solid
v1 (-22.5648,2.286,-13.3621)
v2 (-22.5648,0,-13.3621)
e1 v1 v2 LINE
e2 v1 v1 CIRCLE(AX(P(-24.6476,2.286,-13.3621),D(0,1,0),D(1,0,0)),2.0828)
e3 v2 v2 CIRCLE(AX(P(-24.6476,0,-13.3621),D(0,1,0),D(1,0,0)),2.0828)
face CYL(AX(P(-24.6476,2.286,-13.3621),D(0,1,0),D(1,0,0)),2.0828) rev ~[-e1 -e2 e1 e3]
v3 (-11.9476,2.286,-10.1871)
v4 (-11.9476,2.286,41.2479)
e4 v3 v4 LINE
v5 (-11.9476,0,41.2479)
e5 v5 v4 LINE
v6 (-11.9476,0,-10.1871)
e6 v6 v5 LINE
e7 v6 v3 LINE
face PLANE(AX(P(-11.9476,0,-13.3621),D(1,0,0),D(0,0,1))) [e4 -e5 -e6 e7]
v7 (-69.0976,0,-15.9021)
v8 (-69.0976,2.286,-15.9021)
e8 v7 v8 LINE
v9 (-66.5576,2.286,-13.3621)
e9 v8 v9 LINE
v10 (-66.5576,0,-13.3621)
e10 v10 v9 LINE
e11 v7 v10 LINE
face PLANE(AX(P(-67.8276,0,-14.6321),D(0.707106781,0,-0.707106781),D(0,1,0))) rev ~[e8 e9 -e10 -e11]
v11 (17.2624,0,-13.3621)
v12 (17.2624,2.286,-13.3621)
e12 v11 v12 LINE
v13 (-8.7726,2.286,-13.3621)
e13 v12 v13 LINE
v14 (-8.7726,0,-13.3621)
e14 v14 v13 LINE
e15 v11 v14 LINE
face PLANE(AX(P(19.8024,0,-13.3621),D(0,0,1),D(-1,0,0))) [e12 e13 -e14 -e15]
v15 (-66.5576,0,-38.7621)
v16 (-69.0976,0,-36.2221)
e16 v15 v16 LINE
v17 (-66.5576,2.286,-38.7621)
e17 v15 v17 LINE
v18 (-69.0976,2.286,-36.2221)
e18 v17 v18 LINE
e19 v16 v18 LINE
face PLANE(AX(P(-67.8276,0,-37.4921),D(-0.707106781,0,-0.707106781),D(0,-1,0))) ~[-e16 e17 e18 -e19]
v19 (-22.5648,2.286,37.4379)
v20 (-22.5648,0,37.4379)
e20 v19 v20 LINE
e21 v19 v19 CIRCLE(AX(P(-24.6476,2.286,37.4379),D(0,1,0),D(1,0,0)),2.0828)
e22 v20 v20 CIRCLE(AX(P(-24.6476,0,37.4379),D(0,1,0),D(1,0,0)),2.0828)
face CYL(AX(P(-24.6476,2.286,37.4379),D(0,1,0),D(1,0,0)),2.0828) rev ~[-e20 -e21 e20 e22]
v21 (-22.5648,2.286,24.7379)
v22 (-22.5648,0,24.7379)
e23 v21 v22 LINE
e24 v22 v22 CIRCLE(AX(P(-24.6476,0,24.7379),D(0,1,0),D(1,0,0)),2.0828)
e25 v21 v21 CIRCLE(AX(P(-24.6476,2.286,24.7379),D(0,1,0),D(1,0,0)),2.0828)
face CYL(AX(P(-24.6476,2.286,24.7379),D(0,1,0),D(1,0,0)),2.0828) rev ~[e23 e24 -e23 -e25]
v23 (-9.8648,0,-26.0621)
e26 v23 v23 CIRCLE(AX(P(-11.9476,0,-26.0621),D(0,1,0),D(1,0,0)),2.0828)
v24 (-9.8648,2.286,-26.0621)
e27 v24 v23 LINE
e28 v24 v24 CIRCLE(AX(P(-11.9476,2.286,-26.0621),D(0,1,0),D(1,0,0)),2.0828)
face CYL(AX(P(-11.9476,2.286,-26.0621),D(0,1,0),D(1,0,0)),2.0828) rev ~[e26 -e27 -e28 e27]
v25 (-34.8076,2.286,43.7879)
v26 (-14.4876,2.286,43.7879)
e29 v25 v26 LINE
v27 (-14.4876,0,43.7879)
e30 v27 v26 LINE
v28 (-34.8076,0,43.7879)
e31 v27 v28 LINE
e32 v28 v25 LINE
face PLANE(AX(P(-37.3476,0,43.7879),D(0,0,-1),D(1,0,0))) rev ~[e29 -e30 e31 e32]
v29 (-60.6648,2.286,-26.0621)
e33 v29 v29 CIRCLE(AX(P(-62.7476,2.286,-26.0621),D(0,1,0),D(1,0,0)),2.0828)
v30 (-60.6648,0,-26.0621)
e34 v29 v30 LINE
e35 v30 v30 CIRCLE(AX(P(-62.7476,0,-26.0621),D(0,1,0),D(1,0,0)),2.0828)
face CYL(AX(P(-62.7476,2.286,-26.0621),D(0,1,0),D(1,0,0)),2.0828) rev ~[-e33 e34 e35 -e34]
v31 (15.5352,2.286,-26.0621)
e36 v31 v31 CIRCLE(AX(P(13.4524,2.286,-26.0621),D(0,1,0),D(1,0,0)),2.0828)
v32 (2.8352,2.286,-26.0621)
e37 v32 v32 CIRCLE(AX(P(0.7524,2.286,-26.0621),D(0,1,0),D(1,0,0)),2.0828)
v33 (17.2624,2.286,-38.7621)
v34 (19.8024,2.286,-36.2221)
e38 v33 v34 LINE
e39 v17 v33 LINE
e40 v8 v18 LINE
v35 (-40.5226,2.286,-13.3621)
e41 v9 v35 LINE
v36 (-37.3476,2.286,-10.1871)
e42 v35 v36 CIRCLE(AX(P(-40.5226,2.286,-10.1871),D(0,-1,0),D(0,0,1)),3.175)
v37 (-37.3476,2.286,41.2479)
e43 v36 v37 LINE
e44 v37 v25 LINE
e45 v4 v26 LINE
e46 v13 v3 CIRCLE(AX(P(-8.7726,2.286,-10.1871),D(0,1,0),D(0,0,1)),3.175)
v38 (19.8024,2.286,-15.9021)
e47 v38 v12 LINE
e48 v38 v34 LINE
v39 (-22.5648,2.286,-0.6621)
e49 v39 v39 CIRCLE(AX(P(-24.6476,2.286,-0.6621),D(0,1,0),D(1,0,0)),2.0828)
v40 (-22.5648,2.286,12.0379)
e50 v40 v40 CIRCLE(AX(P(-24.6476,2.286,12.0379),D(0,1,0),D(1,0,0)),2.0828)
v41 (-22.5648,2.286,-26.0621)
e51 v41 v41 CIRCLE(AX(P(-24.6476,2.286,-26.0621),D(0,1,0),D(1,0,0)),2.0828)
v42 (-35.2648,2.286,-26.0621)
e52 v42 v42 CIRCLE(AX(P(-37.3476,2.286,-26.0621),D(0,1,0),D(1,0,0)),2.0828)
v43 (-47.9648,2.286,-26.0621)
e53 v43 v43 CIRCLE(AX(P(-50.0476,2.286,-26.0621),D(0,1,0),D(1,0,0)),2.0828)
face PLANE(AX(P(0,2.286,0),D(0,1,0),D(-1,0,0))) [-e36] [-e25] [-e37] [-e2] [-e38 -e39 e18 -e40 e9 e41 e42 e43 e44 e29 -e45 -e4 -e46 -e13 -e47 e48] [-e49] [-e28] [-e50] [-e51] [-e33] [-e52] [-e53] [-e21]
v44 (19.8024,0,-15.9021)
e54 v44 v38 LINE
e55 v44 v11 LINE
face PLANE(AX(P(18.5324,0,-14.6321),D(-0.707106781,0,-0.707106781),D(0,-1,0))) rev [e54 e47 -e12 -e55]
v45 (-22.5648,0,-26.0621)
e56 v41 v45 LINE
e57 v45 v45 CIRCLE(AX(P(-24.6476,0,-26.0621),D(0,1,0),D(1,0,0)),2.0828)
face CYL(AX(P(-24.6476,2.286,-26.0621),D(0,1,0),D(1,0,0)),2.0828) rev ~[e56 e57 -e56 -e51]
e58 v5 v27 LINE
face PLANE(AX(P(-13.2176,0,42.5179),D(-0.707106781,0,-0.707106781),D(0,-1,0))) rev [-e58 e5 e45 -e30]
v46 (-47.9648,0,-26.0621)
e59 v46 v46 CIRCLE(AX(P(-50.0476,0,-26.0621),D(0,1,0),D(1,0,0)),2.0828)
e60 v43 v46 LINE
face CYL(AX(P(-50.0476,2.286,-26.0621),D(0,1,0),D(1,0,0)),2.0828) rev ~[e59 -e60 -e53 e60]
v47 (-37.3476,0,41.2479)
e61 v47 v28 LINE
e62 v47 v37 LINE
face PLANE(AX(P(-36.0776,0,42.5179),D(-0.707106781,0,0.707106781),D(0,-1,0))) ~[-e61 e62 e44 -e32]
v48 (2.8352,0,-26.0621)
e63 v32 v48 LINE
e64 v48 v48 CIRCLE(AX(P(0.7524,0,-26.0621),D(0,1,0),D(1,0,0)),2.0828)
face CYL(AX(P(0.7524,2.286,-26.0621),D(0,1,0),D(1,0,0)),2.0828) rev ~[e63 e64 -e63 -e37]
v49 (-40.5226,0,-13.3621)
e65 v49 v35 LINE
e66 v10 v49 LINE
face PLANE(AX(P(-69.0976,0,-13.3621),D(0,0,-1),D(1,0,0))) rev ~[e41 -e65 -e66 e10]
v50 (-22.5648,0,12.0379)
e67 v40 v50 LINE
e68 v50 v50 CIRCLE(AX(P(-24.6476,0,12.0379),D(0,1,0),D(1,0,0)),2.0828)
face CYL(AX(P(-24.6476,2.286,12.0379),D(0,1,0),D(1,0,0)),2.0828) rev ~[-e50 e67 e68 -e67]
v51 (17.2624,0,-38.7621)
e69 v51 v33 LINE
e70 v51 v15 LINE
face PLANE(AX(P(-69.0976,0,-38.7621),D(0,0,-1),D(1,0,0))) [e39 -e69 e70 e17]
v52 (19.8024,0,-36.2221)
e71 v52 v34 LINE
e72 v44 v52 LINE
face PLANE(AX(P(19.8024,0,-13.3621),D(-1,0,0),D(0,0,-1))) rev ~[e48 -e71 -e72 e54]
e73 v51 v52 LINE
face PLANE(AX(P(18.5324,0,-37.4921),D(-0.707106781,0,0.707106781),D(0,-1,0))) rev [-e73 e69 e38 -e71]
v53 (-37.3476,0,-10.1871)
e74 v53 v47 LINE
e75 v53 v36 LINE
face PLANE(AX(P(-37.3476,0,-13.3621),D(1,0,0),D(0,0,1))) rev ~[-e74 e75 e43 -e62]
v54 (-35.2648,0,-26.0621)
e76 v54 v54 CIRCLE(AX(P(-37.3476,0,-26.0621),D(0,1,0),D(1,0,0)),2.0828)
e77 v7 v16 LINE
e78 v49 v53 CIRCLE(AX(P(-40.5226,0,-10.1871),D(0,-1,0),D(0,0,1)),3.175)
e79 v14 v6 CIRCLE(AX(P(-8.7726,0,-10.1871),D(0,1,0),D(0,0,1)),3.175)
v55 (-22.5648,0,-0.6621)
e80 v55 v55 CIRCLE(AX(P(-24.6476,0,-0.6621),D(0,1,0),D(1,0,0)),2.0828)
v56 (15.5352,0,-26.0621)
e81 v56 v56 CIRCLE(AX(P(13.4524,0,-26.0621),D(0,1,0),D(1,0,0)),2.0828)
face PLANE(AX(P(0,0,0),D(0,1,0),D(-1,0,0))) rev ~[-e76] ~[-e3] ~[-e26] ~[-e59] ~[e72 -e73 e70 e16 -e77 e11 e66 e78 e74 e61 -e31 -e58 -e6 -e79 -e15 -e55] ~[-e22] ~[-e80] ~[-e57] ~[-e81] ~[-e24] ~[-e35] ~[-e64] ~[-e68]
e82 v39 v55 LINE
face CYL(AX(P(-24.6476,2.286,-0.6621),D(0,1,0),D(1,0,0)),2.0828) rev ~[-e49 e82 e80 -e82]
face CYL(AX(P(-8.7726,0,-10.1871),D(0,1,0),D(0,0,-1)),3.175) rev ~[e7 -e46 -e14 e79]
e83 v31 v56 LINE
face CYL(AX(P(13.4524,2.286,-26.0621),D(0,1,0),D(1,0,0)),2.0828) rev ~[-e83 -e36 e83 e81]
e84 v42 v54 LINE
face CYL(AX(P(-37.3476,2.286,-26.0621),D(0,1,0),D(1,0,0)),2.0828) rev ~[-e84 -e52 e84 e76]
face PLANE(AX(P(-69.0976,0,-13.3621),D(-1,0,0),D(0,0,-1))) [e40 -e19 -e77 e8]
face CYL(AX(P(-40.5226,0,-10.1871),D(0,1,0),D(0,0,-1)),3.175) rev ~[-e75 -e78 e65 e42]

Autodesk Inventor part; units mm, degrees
ref_plane "YZ Plane" through (0, 0, 0) normal (1, 0, 0) x (0, 1, 0)
ref_plane "XZ Plane" through (0, 0, 0) normal (0, 1, 0) x (-1, 0, 0)
ref_plane "XY Plane" through (0, 0, 0) normal (0, 0, 1) x (1, 0, 0)
sketch "Sketch1" plane through (0, 0, 0) normal (0, 1, 0) x (-1, 0, 0)
  line L0 (69.0976, -38.7621) -> (24.6476, -38.7621)
  line L1 (69.0976, -13.3621) -> (69.0976, -38.7621)
  line L2 (24.6476, -38.7621) -> (41.922, -38.7621)
  line L3 (37.3476, 43.7879) -> (24.6476, 43.7879)
  line L4 (69.0976, -13.3621) -> (37.3476, -13.3621)
  line L5 (37.3476, -13.3621) -> (37.3476, 43.7879)
  line L6 (-19.8024, -38.7621) -> (24.6476, -38.7621)
  line L7 (-19.8024, -13.3621) -> (-19.8024, -38.7621)
  line L8 (24.6476, -38.7621) -> (7.3732, -38.7621)
  line L9 (11.9476, 43.7879) -> (24.6476, 43.7879)
  line L10 (-19.8024, -13.3621) -> (11.9476, -13.3621)
  line L11 (11.9476, -13.3621) -> (11.9476, 43.7879)
  point P0 (0, 0)
  dimension "d0" = 44.45
  dimension "d1" = 12.7
  dimension "d2" = 25.4
  dimension "d3" = 82.55
extrude "Extrusion1" add sketch "Sketch1" along normal blind 2.286
sketch "Sketch2" plane through (0, 2.286, 0) normal (0, 1, 0) x (1, 0, 0)
  circle A0 centre (-24.6476, 26.0621) radius 2.0828
  line L0 (19.8024, 38.7621) -> (-69.0976, 38.7621) projected
  line L1 (19.8024, 13.3621) -> (19.8024, 38.7621) projected
  point P0 (0, 0)
  dimension "d6" = 4.1656
  dimension "d7" = 12.7
  dimension "d8" = 44.45
extrude "Extrusion2" cut sketch "Sketch2" against normal blind 2.286
pattern_linear "Rectangular Pattern1" count 4 spacing 12.7 along (1, 0, 0) count 4 spacing 12.7 along (-1, 0, 0) of "Extrusion2"
pattern_linear "Rectangular Pattern2" count 6 spacing 12.7 along (0, 0, 1) of "Extrusion2"
chamfer "Chamfer1" distance 2.54 angle 45 6 edges at (-69.0976, 1.143, -13.3621) (-37.3476, 1.143, 43.7879) (-11.9476, 1.143, 43.7879) (19.8024, 1.143, -13.3621) (19.8024, 1.143, -38.7621) (-69.0976, 1.143, -38.7621)
fillet "Fillet1" radius 3.175 2 edges at (-37.3476, 1.143, -13.3621) (-11.9476, 1.143, -13.3621)
properties part number "TGusset Versa"
